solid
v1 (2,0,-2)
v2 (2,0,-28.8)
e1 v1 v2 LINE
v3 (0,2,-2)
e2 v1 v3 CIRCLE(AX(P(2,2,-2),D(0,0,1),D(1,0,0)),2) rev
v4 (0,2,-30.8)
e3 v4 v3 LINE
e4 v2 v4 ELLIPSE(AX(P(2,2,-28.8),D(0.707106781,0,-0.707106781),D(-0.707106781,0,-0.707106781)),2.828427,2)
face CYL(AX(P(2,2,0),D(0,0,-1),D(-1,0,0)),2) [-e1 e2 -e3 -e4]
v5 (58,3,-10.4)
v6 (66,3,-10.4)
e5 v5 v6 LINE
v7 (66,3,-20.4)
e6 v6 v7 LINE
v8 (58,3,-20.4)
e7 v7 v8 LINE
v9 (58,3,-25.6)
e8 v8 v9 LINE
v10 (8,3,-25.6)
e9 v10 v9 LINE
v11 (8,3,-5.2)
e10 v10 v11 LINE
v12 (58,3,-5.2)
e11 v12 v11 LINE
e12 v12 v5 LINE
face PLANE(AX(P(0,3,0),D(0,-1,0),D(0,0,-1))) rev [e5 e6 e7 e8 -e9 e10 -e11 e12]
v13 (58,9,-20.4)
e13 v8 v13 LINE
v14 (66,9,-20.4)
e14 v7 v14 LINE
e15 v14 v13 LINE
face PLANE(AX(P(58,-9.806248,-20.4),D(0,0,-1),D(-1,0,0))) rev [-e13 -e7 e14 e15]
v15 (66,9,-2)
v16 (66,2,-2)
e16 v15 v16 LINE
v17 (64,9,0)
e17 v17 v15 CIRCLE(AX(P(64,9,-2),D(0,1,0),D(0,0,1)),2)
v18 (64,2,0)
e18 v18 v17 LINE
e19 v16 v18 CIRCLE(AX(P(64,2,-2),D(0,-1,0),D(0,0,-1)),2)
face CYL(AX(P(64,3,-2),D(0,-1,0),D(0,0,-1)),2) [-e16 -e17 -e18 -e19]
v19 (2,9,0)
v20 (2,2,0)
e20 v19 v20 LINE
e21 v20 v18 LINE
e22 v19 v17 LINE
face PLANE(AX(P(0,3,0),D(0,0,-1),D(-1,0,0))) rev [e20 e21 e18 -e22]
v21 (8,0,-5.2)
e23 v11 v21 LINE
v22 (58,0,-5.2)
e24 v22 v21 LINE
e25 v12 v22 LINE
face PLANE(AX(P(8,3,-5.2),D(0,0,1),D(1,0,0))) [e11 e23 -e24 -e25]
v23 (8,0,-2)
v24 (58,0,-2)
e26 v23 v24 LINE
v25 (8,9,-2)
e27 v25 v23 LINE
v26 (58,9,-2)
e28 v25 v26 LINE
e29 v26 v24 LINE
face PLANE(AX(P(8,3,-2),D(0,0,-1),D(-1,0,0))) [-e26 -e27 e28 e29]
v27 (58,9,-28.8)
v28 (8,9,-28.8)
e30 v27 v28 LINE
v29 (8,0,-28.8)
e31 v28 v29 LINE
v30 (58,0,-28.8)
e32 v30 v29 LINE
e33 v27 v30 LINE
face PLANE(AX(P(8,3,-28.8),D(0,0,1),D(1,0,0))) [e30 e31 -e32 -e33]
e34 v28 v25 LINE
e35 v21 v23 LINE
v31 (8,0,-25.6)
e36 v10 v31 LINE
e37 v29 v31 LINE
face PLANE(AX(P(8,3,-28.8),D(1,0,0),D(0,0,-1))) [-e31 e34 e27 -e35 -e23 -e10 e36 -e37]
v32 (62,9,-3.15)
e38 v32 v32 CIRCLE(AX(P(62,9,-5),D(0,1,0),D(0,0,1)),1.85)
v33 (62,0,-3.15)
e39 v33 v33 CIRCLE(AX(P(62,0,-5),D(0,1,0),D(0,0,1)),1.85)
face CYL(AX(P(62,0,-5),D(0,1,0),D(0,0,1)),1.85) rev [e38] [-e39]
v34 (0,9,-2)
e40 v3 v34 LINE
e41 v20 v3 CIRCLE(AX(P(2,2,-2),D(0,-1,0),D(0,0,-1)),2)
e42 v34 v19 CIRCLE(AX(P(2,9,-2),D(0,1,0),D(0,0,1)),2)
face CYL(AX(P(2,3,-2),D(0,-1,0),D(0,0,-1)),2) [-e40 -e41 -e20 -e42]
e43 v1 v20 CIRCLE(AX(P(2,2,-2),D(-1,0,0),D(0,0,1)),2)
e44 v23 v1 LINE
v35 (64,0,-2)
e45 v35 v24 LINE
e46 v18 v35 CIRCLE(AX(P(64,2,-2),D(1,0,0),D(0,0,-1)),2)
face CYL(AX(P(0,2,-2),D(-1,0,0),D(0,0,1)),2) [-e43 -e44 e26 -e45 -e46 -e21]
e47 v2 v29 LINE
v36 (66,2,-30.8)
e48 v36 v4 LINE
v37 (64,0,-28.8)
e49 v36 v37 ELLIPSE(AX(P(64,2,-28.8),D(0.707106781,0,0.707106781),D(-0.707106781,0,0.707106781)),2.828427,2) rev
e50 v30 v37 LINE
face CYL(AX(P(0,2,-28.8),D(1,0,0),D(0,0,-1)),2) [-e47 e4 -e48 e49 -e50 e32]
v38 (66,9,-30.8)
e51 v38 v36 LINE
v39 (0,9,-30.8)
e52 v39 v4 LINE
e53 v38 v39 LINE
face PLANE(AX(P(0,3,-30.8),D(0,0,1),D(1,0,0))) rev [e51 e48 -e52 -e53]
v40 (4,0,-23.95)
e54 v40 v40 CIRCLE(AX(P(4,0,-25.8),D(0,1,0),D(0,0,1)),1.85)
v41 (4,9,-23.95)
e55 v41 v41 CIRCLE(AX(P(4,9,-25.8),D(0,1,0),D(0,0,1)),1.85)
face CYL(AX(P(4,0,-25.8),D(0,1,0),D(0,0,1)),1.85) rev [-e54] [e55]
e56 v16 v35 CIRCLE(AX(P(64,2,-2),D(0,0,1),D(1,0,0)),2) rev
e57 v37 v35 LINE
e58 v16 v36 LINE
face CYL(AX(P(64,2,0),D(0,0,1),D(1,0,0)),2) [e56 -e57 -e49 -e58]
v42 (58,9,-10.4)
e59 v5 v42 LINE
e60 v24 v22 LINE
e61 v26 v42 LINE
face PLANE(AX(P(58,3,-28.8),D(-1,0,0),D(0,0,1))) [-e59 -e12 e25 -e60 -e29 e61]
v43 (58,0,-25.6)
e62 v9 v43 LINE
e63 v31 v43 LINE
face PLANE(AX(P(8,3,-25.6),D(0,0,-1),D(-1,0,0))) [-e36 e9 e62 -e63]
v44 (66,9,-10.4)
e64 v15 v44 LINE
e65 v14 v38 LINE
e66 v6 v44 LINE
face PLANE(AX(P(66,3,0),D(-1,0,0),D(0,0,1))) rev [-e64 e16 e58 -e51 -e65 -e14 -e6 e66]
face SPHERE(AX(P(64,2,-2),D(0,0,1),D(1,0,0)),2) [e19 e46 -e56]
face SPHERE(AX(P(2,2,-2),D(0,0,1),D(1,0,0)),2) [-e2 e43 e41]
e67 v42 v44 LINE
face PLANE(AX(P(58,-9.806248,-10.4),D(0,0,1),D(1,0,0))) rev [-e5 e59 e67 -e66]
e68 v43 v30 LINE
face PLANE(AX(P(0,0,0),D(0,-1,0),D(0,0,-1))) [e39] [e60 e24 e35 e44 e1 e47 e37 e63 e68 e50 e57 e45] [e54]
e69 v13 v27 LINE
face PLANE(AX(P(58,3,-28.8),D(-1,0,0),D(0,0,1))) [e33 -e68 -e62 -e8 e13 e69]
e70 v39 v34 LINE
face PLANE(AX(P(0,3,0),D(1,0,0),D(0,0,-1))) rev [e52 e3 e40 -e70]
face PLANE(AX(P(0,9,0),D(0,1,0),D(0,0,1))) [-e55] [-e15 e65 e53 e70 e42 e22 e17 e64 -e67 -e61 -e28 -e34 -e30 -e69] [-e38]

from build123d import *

# Parameters (mm, degrees)
SKETCH1_W           = 66
SKETCH1_H           = 30.8
SKETCH1_W_2         = 50
SKETCH1_H_2         = 3.2
BOSS_EXTRUDE1_DEPTH = 3
SKETCH2_W           = 66
SKETCH2_H           = 30.8
SKETCH2_W_2         = 50
SKETCH2_H_2         = 26.8
BOSS_EXTRUDE2_DEPTH = 6
SKETCH3_R           = 1.85
CUT_EXTRUDE1_DEPTH  = 74.386919815
FILLET1_R           = 2
SKETCH4_W           = 8
SKETCH4_H           = 10
CUT_EXTRUDE2_DEPTH  = 6


with BuildPart() as part:
    # Sketch1 → Boss-Extrude1 (new body)
    with BuildSketch(Plane(origin=(0, 0, 0), x_dir=(1, 0, 0), z_dir=(0, 1, 0))):
        with Locations((33, 15.4)):
            Rectangle(SKETCH1_W, SKETCH1_H)
        with Locations((33, 27.2)):
            Rectangle(SKETCH1_W_2, SKETCH1_H_2, mode=Mode.SUBTRACT)
        with Locations((33, 3.6)):
            Rectangle(SKETCH1_W_2, SKETCH1_H_2, mode=Mode.SUBTRACT)
    extrude(amount=BOSS_EXTRUDE1_DEPTH)

    # Sketch2 → Boss-Extrude2 (add)
    with BuildSketch(Plane(origin=(0, 3, 0), x_dir=(1, 0, 0), z_dir=(0, 1, 0))):
        with Locations((33, 15.4)):
            Rectangle(SKETCH2_W, SKETCH2_H)
        with Locations((33, 15.4)):
            Rectangle(SKETCH2_W_2, SKETCH2_H_2, mode=Mode.SUBTRACT)
    extrude(amount=BOSS_EXTRUDE2_DEPTH)

    # Sketch3 → Cut-Extrude1 (cut, through all)
    with BuildSketch(Plane(origin=(0, 9, 0), x_dir=(1, 0, 0), z_dir=(0, 1, 0))):
        with Locations(Location((62, 5, 0), (0, 0, 270))):
            Circle(SKETCH3_R)
        with Locations(Location((4, 25.8, 0), (0, 0, 270))):
            Circle(SKETCH3_R)
    extrude(amount=-CUT_EXTRUDE1_DEPTH, mode=Mode.SUBTRACT)

    # Fillet1
    fillet1_edges = [part.edges().sort_by_distance(p)[0] for p in [
        (33, 0, -30.8),
        (66, 0, -15.4),
        (33, 0, 0),
        (0, 0, -15.4),
        (66, 4.5, 0),
        (0, 4.5, 0),
    ]]
    fillet(fillet1_edges, radius=FILLET1_R - 0.0001)  # a hair under: the kernel refuses the full size

    # Sketch4 → Cut-Extrude2 (cut)
    with BuildSketch(Plane(origin=(0, 9, 0), x_dir=(1, 0, 0), z_dir=(0, 1, 0))):
        with Locations((62, 15.4)):
            Rectangle(SKETCH4_W, SKETCH4_H)
    extrude(amount=-CUT_EXTRUDE2_DEPTH, mode=Mode.SUBTRACT)


solid = part.part
